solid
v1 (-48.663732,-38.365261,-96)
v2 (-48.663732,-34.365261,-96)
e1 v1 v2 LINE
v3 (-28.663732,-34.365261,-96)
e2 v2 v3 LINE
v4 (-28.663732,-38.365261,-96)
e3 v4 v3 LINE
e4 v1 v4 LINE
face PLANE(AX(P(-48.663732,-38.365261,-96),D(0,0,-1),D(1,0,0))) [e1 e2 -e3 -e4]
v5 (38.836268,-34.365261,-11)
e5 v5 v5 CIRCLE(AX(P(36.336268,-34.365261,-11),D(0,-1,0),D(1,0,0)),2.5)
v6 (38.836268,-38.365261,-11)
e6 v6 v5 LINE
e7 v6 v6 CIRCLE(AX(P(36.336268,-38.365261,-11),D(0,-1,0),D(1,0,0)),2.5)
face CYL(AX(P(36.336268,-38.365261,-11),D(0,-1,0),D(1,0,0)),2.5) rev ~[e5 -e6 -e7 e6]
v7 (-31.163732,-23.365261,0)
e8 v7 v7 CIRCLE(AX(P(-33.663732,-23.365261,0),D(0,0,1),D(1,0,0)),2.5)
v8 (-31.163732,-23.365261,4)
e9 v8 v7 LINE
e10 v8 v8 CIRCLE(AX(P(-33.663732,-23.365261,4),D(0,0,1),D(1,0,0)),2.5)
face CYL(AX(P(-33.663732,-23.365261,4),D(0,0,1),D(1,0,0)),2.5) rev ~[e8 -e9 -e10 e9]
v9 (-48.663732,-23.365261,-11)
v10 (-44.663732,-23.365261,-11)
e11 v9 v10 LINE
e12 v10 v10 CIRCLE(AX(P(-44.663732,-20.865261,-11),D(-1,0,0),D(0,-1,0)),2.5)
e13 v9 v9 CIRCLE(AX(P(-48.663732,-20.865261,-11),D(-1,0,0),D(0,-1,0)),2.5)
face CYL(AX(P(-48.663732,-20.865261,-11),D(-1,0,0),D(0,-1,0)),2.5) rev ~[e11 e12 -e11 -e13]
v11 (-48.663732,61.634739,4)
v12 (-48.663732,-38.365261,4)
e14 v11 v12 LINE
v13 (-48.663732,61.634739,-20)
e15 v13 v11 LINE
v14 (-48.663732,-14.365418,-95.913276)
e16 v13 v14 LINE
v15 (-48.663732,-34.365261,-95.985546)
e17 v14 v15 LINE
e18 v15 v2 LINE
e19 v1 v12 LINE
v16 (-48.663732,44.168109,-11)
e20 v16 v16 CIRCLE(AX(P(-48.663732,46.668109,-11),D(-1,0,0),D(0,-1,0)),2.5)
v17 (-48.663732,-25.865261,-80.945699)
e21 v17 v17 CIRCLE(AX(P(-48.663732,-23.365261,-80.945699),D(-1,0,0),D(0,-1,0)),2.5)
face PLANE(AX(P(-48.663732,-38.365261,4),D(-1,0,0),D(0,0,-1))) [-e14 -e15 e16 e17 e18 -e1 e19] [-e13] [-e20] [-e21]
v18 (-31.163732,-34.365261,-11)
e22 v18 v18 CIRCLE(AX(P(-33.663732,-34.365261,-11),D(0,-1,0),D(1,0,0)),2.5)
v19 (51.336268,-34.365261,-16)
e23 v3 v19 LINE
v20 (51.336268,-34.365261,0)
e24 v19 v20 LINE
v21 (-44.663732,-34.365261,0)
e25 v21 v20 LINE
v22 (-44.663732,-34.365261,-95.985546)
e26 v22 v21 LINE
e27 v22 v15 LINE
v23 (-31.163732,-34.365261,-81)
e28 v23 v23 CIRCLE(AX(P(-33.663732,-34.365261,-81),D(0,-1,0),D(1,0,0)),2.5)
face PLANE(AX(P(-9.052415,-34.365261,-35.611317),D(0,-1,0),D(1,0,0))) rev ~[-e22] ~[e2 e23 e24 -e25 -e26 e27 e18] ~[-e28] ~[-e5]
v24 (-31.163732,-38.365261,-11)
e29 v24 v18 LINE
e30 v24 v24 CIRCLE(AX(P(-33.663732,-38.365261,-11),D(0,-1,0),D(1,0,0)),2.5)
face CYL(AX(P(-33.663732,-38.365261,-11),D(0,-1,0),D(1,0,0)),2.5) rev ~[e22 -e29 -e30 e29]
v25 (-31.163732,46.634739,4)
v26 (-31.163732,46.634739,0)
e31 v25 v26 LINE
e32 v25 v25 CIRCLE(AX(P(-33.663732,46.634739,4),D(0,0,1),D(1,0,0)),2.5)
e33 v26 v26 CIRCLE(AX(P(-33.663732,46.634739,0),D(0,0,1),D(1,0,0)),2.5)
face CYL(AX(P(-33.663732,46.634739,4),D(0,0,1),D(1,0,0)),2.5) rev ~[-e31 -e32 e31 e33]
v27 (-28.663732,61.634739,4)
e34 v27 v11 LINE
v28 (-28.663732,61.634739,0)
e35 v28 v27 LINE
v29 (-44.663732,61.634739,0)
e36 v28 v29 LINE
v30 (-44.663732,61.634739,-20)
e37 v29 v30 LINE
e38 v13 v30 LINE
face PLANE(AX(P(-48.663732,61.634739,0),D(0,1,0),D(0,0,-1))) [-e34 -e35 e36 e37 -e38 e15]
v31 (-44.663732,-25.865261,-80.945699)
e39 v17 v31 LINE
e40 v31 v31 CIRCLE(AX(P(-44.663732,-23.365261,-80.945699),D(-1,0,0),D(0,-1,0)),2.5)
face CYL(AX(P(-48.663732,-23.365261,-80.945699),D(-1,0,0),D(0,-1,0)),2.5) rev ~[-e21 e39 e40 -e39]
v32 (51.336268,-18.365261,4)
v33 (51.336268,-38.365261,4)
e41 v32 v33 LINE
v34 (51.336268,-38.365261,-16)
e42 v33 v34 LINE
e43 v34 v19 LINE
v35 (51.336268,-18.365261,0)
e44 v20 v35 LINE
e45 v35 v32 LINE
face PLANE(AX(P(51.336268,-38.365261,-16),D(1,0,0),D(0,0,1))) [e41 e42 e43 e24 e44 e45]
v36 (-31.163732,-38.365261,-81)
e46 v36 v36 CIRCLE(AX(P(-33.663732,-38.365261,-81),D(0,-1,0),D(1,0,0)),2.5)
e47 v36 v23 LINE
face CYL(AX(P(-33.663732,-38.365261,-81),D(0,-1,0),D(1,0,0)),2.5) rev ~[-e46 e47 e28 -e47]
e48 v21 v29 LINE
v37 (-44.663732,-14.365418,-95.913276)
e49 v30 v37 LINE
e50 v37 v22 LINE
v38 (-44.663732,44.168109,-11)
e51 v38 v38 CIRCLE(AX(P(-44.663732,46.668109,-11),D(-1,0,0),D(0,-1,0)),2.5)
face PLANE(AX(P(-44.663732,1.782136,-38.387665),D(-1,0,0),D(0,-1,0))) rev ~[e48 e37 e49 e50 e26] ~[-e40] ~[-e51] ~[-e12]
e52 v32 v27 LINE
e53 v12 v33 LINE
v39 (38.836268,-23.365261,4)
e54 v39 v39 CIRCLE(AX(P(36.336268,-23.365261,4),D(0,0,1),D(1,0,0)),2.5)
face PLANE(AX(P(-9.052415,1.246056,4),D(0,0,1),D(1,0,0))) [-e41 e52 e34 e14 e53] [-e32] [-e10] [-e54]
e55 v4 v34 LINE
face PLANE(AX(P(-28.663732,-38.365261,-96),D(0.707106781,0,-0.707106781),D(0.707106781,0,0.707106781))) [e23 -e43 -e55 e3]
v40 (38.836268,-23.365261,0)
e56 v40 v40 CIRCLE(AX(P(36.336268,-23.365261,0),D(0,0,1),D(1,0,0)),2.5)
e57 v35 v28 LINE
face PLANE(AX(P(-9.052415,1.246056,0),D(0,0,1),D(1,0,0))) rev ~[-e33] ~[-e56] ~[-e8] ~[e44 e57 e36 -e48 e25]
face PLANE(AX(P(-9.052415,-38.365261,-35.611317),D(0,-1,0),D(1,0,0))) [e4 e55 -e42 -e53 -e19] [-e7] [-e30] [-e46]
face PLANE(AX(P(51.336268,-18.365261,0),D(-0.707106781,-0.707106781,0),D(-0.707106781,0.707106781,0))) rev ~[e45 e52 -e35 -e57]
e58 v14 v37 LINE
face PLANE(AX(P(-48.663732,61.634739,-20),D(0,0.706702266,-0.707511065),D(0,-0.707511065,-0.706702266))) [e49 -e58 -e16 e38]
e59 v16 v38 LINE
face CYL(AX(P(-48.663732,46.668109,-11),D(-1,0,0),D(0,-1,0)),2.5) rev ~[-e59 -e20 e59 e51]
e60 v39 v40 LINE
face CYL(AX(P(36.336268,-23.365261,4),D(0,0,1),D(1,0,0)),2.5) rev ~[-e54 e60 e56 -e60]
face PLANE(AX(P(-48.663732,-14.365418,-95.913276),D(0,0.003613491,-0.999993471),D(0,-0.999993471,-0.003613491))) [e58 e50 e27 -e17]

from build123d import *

# Parameters (mm, degrees)
F1_DEPTH  = 4
F4_DEPTH  = 4
F9_DEPTH  = 4
F10_R     = 2
F11_DEPTH = 4
F12_R     = 2.5
F13_DEPTH = 4
F14_R     = 2.5
F15_DEPTH = 4
F16_R     = 2.5
F17_DEPTH = 4


with BuildPart() as f1:
    # F0 (on Top) → F1 (new body)
    with BuildSketch(Plane.XY):
        Polygon((-28.663731938, 61.6347389425), (-48.663731938, 61.6347389425), (-48.663731938, -38.3652610575), (51.336268062, -38.3652610575), (51.336268062, -18.3652610575), align=None)
    extrude(amount=F1_DEPTH)



with BuildPart() as f4:
    # F3 (on offset) → F4 (new body)
    with BuildSketch(Plane(origin=(-48.663731938, 0, 0), x_dir=(0, -1, 0), z_dir=(-1, 0, 0))):
        Polygon((38.3652610575, 0), (-61.6347389425, 0), (-61.6347389425, -20), (14.3654177458, -95.9132762154), (38.3652610575, -96), align=None)
    extrude(amount=-F4_DEPTH)


with BuildPart() as f1_1:
    add(f1.part)

    add(f4.part)  # F9 merges F4
    # F8 (on offset) → F9 (join)
    with BuildSketch(Plane.XZ.offset(38.3652610575)):
        Polygon((51.336268062, -16), (51.336268062, 4), (-48.663731938, 4), (-48.663731938, -96), (-28.663731938, -96), align=None)
    extrude(amount=-F9_DEPTH)

    # F10 (on face) → F11 (cut)
    with BuildSketch(Plane.XZ.offset(38.3652610575)):
        with Locations((36.336268062, -11)):
            Circle(F10_R)
        with Locations((-33.663731938, -11)):
            Circle(F10_R)
        with Locations((-33.663731938, -81)):
            Circle(F10_R)
    extrude(amount=-F11_DEPTH, mode=Mode.SUBTRACT)

    # F12 (on face) → F13 (cut)
    with BuildSketch(Plane.XZ.offset(38.3652610575)):
        with Locations((36.336268062, -11)):
            Circle(F12_R)
        with Locations((-33.663731938, -11)):
            Circle(F12_R)
        with Locations((-33.663731938, -81)):
            Circle(F12_R)
    extrude(amount=-F13_DEPTH, mode=Mode.SUBTRACT)

    # F14 (on face) → F15 (cut)
    with BuildSketch(Plane(origin=(-48.663731938, 0, 0), x_dir=(0, -1, 0), z_dir=(-1, 0, 0))):
        with Locations((-46.6681093954, -11)):
            Circle(F14_R)
        with Locations((20.8652610575, -11)):
            Circle(F14_R)
        with Locations((23.3652610575, -80.9456993499)):
            Circle(F14_R)
    extrude(amount=-F15_DEPTH, mode=Mode.SUBTRACT)

    # F16 (on face) → F17 (cut)
    with BuildSketch(Plane.XY.offset(4)):
        with Locations((-33.663731938, 46.6347389425)):
            Circle(F16_R)
        with Locations((-33.663731938, -23.3652610575)):
            Circle(F16_R)
        with Locations((36.336268062, -23.3652610575)):
            Circle(F16_R)
    extrude(amount=-F17_DEPTH, mode=Mode.SUBTRACT)


solid = f1_1.part
